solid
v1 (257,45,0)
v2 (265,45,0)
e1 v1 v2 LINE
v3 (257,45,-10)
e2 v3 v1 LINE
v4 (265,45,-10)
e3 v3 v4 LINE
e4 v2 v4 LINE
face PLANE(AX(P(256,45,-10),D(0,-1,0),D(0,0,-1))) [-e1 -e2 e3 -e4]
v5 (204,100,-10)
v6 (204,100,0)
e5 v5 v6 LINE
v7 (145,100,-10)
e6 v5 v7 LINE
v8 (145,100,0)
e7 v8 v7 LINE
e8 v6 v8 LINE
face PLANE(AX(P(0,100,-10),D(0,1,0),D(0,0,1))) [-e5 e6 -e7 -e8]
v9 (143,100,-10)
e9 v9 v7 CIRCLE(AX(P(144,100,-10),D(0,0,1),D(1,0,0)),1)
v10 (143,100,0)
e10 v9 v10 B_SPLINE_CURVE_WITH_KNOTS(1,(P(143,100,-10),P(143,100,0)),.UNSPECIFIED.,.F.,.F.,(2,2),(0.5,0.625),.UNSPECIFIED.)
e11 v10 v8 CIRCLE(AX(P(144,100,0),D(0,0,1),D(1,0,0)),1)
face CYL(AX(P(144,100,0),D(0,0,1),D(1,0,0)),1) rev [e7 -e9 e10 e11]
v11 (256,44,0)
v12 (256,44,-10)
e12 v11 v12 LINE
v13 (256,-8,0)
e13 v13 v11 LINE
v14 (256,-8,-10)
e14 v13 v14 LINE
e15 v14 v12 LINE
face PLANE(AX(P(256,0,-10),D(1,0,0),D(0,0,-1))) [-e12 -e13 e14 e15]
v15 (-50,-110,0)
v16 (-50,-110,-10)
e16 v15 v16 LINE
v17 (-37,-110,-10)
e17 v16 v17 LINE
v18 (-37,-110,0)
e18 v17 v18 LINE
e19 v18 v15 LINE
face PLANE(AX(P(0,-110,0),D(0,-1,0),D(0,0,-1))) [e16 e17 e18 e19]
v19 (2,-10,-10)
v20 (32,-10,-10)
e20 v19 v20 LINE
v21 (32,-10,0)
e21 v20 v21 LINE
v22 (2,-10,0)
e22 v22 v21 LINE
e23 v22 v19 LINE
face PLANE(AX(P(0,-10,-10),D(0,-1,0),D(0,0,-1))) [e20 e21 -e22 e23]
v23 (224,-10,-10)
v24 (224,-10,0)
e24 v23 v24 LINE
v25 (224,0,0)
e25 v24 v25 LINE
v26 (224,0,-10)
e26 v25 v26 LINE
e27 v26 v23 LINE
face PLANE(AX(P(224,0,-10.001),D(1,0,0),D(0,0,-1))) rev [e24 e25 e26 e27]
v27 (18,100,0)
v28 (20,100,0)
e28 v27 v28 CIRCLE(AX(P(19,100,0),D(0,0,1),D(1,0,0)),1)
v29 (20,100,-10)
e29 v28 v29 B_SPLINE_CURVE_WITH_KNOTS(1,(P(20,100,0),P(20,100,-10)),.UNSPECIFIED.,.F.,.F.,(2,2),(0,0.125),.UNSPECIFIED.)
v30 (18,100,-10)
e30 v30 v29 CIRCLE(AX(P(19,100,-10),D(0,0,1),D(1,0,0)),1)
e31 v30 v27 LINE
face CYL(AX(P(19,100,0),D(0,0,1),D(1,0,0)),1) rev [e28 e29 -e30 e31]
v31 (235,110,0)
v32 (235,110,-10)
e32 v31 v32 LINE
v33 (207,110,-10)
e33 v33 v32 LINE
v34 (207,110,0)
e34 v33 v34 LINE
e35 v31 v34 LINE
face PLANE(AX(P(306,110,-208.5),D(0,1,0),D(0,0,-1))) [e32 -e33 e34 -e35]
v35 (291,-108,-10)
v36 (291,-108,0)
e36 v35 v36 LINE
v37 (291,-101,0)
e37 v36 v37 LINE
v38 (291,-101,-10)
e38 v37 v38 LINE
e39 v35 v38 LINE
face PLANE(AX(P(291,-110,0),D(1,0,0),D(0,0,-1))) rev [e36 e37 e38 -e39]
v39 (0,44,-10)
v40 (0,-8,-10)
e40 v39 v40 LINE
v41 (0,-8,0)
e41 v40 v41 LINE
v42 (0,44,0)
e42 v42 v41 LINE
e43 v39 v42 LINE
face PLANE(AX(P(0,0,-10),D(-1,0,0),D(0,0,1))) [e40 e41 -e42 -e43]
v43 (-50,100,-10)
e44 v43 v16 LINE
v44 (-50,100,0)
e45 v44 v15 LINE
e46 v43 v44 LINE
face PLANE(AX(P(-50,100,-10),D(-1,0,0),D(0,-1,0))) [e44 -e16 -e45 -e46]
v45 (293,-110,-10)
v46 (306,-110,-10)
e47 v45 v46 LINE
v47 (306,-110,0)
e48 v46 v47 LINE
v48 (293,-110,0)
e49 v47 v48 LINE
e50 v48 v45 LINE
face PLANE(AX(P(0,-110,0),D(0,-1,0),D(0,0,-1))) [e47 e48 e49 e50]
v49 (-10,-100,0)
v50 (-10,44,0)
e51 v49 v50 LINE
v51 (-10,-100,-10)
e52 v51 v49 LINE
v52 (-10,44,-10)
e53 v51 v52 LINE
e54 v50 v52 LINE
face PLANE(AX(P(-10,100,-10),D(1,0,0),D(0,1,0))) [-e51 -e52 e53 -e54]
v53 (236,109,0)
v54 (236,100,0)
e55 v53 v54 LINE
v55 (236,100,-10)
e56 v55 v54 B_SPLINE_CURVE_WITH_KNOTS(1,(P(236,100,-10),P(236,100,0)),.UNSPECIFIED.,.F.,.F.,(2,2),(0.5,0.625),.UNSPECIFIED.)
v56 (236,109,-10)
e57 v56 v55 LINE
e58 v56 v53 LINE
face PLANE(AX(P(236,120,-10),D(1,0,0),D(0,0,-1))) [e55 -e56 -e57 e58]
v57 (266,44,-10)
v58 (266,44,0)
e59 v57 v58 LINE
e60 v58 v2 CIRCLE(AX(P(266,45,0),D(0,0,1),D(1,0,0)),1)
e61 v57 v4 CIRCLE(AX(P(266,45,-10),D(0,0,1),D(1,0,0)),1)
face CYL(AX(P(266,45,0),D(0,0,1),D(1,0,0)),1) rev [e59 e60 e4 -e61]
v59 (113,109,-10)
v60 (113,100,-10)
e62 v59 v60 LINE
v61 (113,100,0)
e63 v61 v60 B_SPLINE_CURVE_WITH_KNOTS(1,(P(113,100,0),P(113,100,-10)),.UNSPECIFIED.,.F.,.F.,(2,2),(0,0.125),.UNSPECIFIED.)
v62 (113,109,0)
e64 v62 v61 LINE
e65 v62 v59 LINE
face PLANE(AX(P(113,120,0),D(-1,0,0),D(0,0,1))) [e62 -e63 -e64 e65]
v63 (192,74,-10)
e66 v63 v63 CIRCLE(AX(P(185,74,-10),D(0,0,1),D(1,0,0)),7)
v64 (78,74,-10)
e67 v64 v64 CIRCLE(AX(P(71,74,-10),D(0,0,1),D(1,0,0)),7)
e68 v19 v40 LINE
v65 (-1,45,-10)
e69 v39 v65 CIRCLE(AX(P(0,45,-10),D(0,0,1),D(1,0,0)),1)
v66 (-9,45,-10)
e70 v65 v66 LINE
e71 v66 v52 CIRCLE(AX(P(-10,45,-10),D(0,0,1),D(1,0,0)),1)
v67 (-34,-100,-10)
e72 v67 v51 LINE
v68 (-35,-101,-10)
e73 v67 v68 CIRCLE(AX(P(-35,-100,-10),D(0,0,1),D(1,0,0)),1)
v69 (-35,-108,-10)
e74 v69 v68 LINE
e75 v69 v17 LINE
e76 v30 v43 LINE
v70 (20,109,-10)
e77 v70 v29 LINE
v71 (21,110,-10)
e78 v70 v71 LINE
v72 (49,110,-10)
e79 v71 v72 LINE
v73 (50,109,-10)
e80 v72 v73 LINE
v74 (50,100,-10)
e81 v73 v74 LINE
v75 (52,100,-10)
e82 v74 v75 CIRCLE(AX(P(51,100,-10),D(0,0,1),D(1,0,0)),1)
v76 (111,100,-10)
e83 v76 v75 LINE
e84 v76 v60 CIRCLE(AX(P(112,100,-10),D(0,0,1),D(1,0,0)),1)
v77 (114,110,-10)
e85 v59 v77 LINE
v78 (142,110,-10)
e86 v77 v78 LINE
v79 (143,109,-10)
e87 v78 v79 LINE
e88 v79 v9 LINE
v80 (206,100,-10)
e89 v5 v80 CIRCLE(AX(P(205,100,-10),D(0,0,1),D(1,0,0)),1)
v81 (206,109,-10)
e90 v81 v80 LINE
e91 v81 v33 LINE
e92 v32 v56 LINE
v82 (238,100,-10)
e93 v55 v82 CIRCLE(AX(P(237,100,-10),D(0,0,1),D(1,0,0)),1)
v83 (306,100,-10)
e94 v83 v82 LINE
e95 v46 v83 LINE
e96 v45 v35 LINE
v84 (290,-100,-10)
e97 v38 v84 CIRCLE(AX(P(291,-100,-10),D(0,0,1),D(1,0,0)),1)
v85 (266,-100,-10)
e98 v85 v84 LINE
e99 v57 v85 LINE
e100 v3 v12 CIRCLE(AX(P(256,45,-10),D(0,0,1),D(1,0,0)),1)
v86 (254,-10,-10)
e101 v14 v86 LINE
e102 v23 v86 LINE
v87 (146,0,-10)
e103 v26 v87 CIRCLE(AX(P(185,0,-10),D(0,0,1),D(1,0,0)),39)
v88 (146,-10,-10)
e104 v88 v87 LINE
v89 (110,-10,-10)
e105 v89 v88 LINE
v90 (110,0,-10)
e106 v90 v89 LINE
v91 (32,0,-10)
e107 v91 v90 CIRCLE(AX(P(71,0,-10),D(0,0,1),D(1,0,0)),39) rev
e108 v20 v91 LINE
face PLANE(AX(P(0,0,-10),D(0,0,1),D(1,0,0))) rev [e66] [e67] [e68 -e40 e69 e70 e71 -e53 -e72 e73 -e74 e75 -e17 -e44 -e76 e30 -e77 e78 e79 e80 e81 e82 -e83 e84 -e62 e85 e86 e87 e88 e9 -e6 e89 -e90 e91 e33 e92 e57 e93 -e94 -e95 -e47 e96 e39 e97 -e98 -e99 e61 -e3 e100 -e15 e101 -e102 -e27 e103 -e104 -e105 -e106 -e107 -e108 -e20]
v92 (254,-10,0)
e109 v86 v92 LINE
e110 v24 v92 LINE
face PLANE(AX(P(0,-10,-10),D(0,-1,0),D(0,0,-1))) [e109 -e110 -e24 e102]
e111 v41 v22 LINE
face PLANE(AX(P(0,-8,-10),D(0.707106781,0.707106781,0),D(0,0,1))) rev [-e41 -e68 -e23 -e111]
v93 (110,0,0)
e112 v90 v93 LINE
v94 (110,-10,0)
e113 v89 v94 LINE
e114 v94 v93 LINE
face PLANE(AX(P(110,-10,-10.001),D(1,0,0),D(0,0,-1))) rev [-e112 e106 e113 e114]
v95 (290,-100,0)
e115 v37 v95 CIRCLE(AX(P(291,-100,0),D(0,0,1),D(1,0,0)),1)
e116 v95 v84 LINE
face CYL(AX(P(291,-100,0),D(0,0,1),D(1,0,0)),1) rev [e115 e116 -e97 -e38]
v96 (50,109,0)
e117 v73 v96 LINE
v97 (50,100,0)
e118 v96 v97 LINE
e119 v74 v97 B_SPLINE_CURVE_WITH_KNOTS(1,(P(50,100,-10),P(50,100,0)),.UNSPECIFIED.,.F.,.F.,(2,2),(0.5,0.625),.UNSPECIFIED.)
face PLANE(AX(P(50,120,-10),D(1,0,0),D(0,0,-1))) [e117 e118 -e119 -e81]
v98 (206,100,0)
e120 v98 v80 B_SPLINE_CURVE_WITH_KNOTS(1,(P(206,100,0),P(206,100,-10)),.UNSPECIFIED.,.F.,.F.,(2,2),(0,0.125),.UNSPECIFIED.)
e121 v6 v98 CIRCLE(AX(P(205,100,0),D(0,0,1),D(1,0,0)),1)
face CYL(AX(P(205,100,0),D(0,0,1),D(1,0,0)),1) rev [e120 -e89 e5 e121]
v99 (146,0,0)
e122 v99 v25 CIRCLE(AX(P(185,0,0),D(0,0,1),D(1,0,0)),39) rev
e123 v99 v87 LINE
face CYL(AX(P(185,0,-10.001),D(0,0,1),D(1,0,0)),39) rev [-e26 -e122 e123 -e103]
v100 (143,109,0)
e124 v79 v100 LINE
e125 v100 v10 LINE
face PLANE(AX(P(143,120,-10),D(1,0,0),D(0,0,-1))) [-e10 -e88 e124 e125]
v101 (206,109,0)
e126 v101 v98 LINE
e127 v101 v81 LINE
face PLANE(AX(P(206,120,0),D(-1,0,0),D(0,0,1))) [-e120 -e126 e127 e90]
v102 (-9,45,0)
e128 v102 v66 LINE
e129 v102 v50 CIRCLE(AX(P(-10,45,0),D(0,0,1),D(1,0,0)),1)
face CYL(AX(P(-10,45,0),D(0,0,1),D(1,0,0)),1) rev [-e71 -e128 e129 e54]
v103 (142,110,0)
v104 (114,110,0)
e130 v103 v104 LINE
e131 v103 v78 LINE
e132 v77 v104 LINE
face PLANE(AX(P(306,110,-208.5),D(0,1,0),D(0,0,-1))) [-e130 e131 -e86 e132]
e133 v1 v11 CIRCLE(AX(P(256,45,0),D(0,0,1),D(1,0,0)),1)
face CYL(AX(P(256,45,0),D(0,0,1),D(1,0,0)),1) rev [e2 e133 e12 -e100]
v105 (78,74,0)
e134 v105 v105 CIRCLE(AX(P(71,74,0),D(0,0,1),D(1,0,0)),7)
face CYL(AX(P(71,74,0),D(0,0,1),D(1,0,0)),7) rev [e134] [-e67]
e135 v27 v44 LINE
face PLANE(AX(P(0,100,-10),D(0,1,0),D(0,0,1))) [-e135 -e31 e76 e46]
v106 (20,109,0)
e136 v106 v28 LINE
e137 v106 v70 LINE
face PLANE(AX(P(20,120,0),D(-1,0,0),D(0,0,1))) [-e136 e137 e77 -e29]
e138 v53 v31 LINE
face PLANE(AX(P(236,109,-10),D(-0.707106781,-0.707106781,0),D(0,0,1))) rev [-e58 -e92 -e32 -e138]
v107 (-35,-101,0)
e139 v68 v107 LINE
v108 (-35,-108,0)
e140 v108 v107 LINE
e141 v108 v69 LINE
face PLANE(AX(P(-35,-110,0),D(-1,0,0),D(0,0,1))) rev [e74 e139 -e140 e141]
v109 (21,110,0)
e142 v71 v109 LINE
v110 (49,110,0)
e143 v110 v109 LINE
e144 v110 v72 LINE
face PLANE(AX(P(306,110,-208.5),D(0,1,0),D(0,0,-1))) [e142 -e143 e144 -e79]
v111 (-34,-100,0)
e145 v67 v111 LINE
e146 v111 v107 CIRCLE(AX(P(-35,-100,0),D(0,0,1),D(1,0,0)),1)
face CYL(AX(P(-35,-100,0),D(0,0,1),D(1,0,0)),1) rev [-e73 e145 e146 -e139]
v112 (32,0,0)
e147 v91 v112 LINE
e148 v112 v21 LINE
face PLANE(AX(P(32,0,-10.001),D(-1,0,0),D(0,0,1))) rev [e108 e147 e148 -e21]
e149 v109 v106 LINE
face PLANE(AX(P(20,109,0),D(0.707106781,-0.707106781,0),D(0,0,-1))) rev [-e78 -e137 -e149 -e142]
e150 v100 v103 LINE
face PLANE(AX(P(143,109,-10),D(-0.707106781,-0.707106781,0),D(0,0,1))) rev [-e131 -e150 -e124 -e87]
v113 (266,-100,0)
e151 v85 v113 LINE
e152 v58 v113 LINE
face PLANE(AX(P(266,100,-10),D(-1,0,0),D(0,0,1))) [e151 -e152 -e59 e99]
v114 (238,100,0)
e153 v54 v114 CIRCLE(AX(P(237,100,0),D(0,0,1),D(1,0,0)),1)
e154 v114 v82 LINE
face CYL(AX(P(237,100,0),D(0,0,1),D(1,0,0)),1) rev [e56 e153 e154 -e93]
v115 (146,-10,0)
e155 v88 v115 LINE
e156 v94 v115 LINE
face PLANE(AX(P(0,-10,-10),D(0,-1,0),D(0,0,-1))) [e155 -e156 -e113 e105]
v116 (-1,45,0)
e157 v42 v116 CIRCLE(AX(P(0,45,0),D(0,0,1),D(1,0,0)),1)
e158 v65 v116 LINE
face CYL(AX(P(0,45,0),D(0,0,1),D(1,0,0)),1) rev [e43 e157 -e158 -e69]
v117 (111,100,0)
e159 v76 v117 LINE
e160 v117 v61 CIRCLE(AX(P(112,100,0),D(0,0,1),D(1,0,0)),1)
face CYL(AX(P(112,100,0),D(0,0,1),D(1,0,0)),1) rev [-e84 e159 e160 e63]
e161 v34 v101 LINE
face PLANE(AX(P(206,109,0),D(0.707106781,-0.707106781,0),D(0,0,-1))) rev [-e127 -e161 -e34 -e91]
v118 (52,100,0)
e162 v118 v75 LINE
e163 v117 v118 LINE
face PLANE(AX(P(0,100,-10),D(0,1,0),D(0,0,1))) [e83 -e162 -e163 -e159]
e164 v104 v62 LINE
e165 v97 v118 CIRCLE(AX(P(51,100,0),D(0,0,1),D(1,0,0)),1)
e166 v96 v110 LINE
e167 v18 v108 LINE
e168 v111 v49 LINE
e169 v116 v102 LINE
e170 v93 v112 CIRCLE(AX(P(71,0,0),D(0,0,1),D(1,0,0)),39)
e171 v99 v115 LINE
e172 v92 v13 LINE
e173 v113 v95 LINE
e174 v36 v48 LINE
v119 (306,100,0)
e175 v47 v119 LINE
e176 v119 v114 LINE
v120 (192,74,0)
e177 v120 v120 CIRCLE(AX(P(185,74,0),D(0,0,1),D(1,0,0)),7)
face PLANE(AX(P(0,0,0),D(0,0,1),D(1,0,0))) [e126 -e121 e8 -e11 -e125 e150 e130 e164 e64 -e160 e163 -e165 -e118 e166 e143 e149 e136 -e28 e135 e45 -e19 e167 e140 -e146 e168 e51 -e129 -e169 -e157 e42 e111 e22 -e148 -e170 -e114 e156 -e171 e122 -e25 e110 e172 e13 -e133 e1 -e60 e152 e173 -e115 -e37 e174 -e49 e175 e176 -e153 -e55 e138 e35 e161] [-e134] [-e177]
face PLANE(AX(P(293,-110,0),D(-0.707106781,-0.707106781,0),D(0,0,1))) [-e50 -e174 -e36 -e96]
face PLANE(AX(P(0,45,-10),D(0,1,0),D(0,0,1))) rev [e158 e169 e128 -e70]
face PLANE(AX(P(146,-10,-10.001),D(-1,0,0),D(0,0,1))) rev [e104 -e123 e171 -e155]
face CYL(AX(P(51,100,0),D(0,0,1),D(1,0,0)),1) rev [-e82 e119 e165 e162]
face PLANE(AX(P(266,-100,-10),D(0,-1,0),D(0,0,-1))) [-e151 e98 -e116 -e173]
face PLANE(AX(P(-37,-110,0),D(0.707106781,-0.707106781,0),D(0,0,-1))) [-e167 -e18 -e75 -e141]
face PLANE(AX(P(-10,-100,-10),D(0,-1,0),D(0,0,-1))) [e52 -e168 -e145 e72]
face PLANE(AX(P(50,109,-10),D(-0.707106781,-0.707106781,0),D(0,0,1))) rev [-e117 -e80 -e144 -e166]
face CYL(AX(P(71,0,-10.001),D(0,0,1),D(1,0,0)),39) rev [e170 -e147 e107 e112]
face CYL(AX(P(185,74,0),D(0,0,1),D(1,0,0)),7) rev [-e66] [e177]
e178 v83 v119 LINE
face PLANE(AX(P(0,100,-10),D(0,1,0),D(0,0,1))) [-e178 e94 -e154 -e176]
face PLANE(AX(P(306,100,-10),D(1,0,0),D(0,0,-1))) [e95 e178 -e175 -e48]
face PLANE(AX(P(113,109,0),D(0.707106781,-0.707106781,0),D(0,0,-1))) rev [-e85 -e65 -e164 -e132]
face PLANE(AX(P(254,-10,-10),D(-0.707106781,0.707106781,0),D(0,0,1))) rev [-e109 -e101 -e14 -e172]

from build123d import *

# Parameters (mm, degrees)
ESQUISSE1_W                               = 256
ESQUISSE1_H                               = 100
T_LE_DE_BASE_PLI_E1_DEPTH                 = 10
ESQUISSE15_W                              = 256
ESQUISSE15_H                              = 10
BOSS_EXTRU_3_DEPTH                        = 10
ENL_V_MAT_EXTRU_1_REACH                   = 277.02
ESQUISSE9_R                               = 39
SKETCH7_W                                 = 10
SKETCH7_H                                 = 55
EXTRUDE2_DEPTH                            = 10
SKETCH8_W                                 = 40
SKETCH8_H                                 = 200
EXTRUDE3_DEPTH                            = 10
ESQUISSE11_W                              = 15
ESQUISSE11_H                              = 10
BOSS_EXTRU_2_DEPTH                        = 10
TROU_POUR_TARAUDAGE_POUR_TROU_TARAUD_M1_D = 14
CHANFREIN1_SIZE                           = 2
TAB_START                                 = -10
TAB_AND_SLOT_TAB1_DEPTH                   = 10
DIAM_TRE_DU_PER_AGE_2_0_2_1_D             = 2
ENL_V_START                               = -10
ESQUISSE19_W                              = 78
ESQUISSE19_H                              = 10
ENL_V_MAT_EXTRU_2_DEPTH                   = 10


# Read off the part's stored shape, not the designer's step: Tab and Slot-Tab1
# Sheet-metal steps are written as plain solids
with BuildPart() as part:
    # Esquisse1 → Tôle de base pliée1 (new body)
    with BuildSketch(Plane.XY):
        with Locations((128, 50)):
            Rectangle(ESQUISSE1_W, ESQUISSE1_H)
    extrude(amount=-T_LE_DE_BASE_PLI_E1_DEPTH)

    # Esquisse15 → Boss.-Extru.3 (add)
    with BuildSketch(Plane.XY):
        with Locations((128, -5)):
            Rectangle(ESQUISSE15_W, ESQUISSE15_H)
    extrude(amount=-BOSS_EXTRU_3_DEPTH)

    # Esquisse9 → Enlèv. mat.-Extru.1 (cut, up to next)
    with BuildSketch(Plane.XY, mode=Mode.PRIVATE) as enl_v_mat_extru_1_sk1:
        with Locations((71, 0)):
            Circle(ESQUISSE9_R)
    enl_v_mat_extru_1_tool1 = extrude(enl_v_mat_extru_1_sk1.sketch, amount=-ENL_V_MAT_EXTRU_1_REACH, mode=Mode.PRIVATE) & part.part
    # Esquisse9 → Enlèv. mat.-Extru.1 (cut, up to next)
    with BuildSketch(Plane.XY, mode=Mode.PRIVATE) as enl_v_mat_extru_1_sk2:
        with Locations((185, 0)):
            Circle(ESQUISSE9_R)
    enl_v_mat_extru_1_tool2 = extrude(enl_v_mat_extru_1_sk2.sketch, amount=-ENL_V_MAT_EXTRU_1_REACH, mode=Mode.PRIVATE) & part.part
    add(enl_v_mat_extru_1_tool1.solids().sort_by_distance((71, 0, 0))[0], mode=Mode.SUBTRACT)
    add(enl_v_mat_extru_1_tool2.solids().sort_by_distance((185, 0, 0))[0], mode=Mode.SUBTRACT)

    # Sketch7 → Extrude2 (add)
    with BuildSketch(Plane.XY):
        with Locations((-5, 72.5)):
            Rectangle(SKETCH7_W, SKETCH7_H)
        with Locations((261, 72.5)):
            Rectangle(SKETCH7_W, SKETCH7_H)
    extrude(amount=-EXTRUDE2_DEPTH)

    # Sketch8 → Extrude3 (add)
    with BuildSketch(Plane.XY):
        with Locations((-30, 0)):
            Rectangle(SKETCH8_W, SKETCH8_H)
        with Locations((286, 0)):
            Rectangle(SKETCH8_W, SKETCH8_H)
    extrude(amount=-EXTRUDE3_DEPTH)

    # Esquisse11 → Boss.-Extru.2 (add)
    with BuildSketch(Plane.XZ.offset(100)):
        with Locations((-42.5, -5)):
            Rectangle(ESQUISSE11_W, ESQUISSE11_H)
        with Locations((298.5, -5)):
            Rectangle(ESQUISSE11_W, ESQUISSE11_H)
    extrude(amount=BOSS_EXTRU_2_DEPTH)

    # Trou pour taraudage pour trou taraudé M161 (through all)
    with Locations(Plane.XY):
        with Locations((71, 74), (185, 74)):
            Hole(TROU_POUR_TARAUDAGE_POUR_TROU_TARAUD_M1_D / 2)

    # Chanfrein1
    chanfrein1_edges = [part.edges().sort_by_distance(p)[0] for p in [
        (-35, -110, -5),
        (291, -110, -5),
        (0, -10, -5),
        (256, -10, -5),
    ]]
    chamfer(chanfrein1_edges, length=CHANFREIN1_SIZE)

    # Tab and Slot-Tab1 outline → Tab and Slot-Tab1 (add)
    with BuildSketch(Plane.XY.offset(TAB_START)):
        Polygon((50, 109), (49, 110), (21, 110), (20, 109), (20, 100), (50, 100), align=None)
        Polygon((206, 109), (206, 100), (236, 100), (236, 109), (235, 110), (207, 110), align=None)
        Polygon((113, 109), (113, 100), (143, 100), (143, 109), (142, 110), (114, 110), align=None)
    extrude(amount=TAB_AND_SLOT_TAB1_DEPTH)

    # Diamètre du perçage Ø2.0 (2)1 (through all)
    with Locations(Plane.XY):
        with Locations((-35, -100)):
            diam_tre_du_per_age_2_0_2_1 = Hole(DIAM_TRE_DU_PER_AGE_2_0_2_1_D / 2)

    # Répét. par esquisse1: Diamètre du perçage Ø2.0 (2)1 at 11 more places
    with Locations((54, 200, 0), (86, 200, 0), (147, 200, 0), (179, 200, 0), (240, 200, 0), (272, 200, 0), (301, 145, 0), (291, 145, 0), (326, 0, 0), (35, 145, 0), (25, 145, 0)):
        add(diam_tre_du_per_age_2_0_2_1, mode=Mode.SUBTRACT)

    # Esquisse19 → Enlèv. mat.-Extru.2 (cut)
    with BuildSketch(Plane.XY.offset(ENL_V_START)):
        with Locations((71, -5)):
            Rectangle(ESQUISSE19_W, ESQUISSE19_H)
        with Locations((185, -5)):
            Rectangle(ESQUISSE19_W, ESQUISSE19_H)
    extrude(amount=ENL_V_MAT_EXTRU_2_DEPTH, mode=Mode.SUBTRACT)


solid = part.part
